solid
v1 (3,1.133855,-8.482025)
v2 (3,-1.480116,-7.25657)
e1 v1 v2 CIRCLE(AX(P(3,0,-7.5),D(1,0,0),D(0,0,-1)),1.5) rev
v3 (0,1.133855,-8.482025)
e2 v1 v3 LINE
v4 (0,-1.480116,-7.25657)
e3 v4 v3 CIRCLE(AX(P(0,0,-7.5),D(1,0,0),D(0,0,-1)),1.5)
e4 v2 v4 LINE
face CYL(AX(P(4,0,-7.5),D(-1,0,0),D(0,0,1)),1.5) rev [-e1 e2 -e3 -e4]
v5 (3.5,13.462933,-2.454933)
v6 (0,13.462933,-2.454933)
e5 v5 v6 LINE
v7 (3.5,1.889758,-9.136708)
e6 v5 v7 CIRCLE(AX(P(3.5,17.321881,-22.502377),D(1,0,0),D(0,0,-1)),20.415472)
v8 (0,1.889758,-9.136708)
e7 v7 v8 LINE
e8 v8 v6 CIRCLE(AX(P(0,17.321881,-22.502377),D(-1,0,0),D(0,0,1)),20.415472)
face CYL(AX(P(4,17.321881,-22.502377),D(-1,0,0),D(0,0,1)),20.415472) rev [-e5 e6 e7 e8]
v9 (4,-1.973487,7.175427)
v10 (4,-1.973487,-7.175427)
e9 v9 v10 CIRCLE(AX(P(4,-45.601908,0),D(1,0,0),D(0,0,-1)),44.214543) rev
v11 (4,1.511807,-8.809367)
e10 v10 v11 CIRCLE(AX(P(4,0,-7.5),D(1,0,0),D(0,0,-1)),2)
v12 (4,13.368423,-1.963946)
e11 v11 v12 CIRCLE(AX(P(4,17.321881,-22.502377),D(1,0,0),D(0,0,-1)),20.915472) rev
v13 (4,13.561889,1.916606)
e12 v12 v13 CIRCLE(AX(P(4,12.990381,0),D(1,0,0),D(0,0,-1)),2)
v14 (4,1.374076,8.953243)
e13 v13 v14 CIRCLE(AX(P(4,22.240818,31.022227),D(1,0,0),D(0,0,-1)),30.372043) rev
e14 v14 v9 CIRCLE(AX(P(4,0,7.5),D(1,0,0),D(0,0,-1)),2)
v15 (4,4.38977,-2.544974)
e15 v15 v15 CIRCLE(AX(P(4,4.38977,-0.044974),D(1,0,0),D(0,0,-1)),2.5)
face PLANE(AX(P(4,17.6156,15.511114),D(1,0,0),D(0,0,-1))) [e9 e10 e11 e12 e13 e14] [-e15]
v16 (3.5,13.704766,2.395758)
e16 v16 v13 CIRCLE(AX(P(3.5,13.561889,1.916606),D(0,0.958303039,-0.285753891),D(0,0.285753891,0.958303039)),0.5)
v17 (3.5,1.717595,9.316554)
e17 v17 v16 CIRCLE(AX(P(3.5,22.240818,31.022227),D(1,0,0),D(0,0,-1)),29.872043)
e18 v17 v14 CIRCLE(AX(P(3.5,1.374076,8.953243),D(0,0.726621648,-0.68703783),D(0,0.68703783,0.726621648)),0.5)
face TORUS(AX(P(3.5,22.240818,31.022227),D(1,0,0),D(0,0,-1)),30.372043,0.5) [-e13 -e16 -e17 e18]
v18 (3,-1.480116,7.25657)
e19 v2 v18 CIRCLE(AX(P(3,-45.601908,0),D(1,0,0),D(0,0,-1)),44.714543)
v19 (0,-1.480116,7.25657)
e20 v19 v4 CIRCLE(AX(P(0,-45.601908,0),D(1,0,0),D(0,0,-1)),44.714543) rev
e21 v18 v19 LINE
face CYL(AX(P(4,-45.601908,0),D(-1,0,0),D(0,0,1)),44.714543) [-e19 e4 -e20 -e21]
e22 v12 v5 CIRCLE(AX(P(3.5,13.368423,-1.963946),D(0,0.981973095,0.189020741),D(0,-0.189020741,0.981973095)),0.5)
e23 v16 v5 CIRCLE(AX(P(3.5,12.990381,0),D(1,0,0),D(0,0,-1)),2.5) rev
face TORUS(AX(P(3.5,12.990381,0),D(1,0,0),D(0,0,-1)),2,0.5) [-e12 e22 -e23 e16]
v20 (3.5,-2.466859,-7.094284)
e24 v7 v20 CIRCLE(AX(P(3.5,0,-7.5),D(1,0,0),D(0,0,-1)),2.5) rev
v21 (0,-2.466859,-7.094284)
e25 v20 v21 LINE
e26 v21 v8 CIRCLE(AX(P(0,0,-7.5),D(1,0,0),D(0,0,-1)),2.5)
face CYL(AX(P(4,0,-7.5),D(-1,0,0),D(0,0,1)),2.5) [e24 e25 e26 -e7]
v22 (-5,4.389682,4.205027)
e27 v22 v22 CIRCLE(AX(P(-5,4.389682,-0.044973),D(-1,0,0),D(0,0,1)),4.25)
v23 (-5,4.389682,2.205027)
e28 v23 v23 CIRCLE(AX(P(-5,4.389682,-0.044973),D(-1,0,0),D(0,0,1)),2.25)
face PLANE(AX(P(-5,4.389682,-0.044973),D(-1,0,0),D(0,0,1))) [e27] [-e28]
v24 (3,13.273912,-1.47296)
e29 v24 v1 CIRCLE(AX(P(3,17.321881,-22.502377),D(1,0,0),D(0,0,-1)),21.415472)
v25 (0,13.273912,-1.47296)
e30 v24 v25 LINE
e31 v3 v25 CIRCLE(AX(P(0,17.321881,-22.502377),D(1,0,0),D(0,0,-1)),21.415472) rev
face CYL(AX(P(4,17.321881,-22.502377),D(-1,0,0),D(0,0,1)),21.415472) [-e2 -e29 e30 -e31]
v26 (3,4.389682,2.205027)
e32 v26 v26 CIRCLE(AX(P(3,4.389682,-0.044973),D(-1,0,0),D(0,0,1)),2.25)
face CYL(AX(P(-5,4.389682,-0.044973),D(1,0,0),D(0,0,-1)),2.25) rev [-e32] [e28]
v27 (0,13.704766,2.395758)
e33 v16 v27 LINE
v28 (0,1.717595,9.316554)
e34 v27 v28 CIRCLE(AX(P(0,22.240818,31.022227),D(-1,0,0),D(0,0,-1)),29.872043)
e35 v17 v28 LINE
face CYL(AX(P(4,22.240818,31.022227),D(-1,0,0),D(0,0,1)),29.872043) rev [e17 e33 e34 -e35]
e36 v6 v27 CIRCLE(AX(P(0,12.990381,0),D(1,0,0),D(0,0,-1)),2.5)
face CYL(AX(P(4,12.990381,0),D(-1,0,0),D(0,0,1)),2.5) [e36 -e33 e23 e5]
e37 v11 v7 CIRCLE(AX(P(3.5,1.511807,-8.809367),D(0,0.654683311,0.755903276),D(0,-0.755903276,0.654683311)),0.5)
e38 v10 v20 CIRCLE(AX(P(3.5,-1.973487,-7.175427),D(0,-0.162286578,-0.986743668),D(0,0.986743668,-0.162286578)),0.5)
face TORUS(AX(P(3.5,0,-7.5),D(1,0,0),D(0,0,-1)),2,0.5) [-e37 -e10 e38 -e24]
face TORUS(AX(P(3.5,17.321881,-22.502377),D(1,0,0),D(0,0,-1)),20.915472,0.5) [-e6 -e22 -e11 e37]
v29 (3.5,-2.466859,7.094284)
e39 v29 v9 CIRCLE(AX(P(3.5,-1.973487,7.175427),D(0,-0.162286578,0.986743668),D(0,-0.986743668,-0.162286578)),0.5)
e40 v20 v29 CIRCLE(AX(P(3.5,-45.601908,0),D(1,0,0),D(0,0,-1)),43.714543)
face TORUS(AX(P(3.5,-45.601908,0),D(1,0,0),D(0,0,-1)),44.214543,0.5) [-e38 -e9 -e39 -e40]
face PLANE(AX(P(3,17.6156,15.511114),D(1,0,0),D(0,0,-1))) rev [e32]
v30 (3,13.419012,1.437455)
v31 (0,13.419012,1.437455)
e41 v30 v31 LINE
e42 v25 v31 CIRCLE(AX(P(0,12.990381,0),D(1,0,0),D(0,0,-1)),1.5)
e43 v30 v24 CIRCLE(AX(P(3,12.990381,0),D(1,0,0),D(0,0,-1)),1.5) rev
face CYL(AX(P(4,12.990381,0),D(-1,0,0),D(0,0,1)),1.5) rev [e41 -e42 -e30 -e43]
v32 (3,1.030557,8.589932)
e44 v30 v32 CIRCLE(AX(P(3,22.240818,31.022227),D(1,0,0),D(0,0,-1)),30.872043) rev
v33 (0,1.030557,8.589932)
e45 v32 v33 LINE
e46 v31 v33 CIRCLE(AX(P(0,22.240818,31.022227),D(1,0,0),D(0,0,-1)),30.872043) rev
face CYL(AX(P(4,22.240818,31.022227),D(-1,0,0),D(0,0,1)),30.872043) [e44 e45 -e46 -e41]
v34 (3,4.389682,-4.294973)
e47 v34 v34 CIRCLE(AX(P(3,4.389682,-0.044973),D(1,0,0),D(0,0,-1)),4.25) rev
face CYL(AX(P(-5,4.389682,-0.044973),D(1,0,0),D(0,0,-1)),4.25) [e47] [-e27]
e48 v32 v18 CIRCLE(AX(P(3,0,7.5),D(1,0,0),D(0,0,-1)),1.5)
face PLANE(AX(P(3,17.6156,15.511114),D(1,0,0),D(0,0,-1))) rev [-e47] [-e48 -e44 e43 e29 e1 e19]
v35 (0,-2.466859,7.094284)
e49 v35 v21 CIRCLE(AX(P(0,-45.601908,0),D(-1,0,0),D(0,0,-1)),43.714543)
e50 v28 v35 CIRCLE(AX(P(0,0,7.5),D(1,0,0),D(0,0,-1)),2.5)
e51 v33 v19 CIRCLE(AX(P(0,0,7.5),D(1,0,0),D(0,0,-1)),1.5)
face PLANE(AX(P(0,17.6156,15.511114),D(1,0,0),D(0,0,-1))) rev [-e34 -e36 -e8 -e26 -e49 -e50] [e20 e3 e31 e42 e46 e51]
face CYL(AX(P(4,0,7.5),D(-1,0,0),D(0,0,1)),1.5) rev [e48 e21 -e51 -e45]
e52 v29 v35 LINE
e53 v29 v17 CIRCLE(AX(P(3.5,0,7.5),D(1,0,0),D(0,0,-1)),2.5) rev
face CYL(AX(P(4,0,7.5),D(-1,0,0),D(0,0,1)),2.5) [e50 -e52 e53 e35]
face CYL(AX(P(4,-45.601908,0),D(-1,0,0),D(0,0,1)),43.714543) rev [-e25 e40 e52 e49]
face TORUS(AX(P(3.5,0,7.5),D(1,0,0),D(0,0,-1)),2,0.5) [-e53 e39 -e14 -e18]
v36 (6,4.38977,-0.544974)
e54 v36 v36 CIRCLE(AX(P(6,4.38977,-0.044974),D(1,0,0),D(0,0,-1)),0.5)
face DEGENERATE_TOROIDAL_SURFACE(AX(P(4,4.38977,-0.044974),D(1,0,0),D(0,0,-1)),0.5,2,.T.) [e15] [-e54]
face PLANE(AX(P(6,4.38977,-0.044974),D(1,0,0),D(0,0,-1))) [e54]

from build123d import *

# Parameters (mm, degrees)
BOSS_EXTRUDE1_DEPTH = 4
FILLET1_R           = 0.5
SHELL2_T            = -1
SKETCH2_R           = 4.25
SKETCH2_R_2         = 2.25
BOSS_EXTRUDE2_DEPTH = 8
SKETCH3_R           = 2.5
BOSS_EXTRUDE3_DEPTH = 2
FILLET2_R           = 2


with BuildPart() as part:
    # Sketch1 → Boss-Extrude1 (new body)
    with BuildSketch(Plane(origin=(0, 0, 0), x_dir=(0, 0, -1), z_dir=(1, 0, 0))):
        with BuildLine():
            ThreePointArc((2.454932738, 13.462932908), (0.124483772, 15.487279891), (-2.395757596, 13.704765785))
            ThreePointArc((-2.395757596, 13.704765785), (-5.152279099, 7.304796743), (-9.316554121, 1.717594576))
            ThreePointArc((-9.316554121, 1.717594576), (-9.70794679, -1.172591563), (-7.094283556, -2.46685917))
            ThreePointArc((-7.094283556, -2.46685917), (0, -1.887364685), (7.094283556, -2.46685917))
            ThreePointArc((7.094283556, -2.46685917), (9.763595355, -1.061195586), (9.136708277, 1.88975819))
            ThreePointArc((9.136708277, 1.88975819), (4.822059624, 7.114144441), (2.454932738, 13.462932908))
        make_face()
    extrude(amount=BOSS_EXTRUDE1_DEPTH)

    # Fillet1
    fillet1_edges = [part.edges().sort_by_distance(p)[0] for p in [
        (4, -1.887364685, 0),
        (4, -1.061195586, -9.763595355),
        (4, 7.114144441, -4.822059624),
        (4, 15.487279891, -0.124483772),
        (4, 7.304796743, 5.152279099),
        (4, -1.172591563, 9.70794679),
    ]]
    fillet(fillet1_edges, radius=FILLET1_R)

    # Shell2
    shell2_openings = [part.faces().sort_by_distance(p)[0] for p in [
        (0, 4.2016107, 0.088845764),
    ]]
    offset(amount=SHELL2_T, openings=shell2_openings, kind=Kind.INTERSECTION)

    # Sketch2 → Boss-Extrude2 (add)
    with BuildSketch(Plane.ZY.offset(-3)):
        with Locations(Location((-0.044973033, 4.389682089, 0), (0, 0, 180))):
            Circle(SKETCH2_R)
        with Locations((-0.044973033, 4.389682089)):
            Circle(SKETCH2_R_2, mode=Mode.SUBTRACT)
    extrude(amount=BOSS_EXTRUDE2_DEPTH)

    # Sketch3 → Boss-Extrude3 (add)
    with BuildSketch(Plane(origin=(4, 0, 0), x_dir=(0, 0, -1), z_dir=(1, 0, 0))):
        with Locations((0.044973661, 4.389769746)):
            Circle(SKETCH3_R)
    extrude(amount=BOSS_EXTRUDE3_DEPTH)

    # Fillet2
    fillet2_edges = [part.edges().sort_by_distance(p)[0] for p in [
        (6, 4.389769746, 2.455026339),
    ]]
    fillet(fillet2_edges, radius=FILLET2_R - 0.0001)  # a hair under: the kernel refuses the full size


solid = part.part
